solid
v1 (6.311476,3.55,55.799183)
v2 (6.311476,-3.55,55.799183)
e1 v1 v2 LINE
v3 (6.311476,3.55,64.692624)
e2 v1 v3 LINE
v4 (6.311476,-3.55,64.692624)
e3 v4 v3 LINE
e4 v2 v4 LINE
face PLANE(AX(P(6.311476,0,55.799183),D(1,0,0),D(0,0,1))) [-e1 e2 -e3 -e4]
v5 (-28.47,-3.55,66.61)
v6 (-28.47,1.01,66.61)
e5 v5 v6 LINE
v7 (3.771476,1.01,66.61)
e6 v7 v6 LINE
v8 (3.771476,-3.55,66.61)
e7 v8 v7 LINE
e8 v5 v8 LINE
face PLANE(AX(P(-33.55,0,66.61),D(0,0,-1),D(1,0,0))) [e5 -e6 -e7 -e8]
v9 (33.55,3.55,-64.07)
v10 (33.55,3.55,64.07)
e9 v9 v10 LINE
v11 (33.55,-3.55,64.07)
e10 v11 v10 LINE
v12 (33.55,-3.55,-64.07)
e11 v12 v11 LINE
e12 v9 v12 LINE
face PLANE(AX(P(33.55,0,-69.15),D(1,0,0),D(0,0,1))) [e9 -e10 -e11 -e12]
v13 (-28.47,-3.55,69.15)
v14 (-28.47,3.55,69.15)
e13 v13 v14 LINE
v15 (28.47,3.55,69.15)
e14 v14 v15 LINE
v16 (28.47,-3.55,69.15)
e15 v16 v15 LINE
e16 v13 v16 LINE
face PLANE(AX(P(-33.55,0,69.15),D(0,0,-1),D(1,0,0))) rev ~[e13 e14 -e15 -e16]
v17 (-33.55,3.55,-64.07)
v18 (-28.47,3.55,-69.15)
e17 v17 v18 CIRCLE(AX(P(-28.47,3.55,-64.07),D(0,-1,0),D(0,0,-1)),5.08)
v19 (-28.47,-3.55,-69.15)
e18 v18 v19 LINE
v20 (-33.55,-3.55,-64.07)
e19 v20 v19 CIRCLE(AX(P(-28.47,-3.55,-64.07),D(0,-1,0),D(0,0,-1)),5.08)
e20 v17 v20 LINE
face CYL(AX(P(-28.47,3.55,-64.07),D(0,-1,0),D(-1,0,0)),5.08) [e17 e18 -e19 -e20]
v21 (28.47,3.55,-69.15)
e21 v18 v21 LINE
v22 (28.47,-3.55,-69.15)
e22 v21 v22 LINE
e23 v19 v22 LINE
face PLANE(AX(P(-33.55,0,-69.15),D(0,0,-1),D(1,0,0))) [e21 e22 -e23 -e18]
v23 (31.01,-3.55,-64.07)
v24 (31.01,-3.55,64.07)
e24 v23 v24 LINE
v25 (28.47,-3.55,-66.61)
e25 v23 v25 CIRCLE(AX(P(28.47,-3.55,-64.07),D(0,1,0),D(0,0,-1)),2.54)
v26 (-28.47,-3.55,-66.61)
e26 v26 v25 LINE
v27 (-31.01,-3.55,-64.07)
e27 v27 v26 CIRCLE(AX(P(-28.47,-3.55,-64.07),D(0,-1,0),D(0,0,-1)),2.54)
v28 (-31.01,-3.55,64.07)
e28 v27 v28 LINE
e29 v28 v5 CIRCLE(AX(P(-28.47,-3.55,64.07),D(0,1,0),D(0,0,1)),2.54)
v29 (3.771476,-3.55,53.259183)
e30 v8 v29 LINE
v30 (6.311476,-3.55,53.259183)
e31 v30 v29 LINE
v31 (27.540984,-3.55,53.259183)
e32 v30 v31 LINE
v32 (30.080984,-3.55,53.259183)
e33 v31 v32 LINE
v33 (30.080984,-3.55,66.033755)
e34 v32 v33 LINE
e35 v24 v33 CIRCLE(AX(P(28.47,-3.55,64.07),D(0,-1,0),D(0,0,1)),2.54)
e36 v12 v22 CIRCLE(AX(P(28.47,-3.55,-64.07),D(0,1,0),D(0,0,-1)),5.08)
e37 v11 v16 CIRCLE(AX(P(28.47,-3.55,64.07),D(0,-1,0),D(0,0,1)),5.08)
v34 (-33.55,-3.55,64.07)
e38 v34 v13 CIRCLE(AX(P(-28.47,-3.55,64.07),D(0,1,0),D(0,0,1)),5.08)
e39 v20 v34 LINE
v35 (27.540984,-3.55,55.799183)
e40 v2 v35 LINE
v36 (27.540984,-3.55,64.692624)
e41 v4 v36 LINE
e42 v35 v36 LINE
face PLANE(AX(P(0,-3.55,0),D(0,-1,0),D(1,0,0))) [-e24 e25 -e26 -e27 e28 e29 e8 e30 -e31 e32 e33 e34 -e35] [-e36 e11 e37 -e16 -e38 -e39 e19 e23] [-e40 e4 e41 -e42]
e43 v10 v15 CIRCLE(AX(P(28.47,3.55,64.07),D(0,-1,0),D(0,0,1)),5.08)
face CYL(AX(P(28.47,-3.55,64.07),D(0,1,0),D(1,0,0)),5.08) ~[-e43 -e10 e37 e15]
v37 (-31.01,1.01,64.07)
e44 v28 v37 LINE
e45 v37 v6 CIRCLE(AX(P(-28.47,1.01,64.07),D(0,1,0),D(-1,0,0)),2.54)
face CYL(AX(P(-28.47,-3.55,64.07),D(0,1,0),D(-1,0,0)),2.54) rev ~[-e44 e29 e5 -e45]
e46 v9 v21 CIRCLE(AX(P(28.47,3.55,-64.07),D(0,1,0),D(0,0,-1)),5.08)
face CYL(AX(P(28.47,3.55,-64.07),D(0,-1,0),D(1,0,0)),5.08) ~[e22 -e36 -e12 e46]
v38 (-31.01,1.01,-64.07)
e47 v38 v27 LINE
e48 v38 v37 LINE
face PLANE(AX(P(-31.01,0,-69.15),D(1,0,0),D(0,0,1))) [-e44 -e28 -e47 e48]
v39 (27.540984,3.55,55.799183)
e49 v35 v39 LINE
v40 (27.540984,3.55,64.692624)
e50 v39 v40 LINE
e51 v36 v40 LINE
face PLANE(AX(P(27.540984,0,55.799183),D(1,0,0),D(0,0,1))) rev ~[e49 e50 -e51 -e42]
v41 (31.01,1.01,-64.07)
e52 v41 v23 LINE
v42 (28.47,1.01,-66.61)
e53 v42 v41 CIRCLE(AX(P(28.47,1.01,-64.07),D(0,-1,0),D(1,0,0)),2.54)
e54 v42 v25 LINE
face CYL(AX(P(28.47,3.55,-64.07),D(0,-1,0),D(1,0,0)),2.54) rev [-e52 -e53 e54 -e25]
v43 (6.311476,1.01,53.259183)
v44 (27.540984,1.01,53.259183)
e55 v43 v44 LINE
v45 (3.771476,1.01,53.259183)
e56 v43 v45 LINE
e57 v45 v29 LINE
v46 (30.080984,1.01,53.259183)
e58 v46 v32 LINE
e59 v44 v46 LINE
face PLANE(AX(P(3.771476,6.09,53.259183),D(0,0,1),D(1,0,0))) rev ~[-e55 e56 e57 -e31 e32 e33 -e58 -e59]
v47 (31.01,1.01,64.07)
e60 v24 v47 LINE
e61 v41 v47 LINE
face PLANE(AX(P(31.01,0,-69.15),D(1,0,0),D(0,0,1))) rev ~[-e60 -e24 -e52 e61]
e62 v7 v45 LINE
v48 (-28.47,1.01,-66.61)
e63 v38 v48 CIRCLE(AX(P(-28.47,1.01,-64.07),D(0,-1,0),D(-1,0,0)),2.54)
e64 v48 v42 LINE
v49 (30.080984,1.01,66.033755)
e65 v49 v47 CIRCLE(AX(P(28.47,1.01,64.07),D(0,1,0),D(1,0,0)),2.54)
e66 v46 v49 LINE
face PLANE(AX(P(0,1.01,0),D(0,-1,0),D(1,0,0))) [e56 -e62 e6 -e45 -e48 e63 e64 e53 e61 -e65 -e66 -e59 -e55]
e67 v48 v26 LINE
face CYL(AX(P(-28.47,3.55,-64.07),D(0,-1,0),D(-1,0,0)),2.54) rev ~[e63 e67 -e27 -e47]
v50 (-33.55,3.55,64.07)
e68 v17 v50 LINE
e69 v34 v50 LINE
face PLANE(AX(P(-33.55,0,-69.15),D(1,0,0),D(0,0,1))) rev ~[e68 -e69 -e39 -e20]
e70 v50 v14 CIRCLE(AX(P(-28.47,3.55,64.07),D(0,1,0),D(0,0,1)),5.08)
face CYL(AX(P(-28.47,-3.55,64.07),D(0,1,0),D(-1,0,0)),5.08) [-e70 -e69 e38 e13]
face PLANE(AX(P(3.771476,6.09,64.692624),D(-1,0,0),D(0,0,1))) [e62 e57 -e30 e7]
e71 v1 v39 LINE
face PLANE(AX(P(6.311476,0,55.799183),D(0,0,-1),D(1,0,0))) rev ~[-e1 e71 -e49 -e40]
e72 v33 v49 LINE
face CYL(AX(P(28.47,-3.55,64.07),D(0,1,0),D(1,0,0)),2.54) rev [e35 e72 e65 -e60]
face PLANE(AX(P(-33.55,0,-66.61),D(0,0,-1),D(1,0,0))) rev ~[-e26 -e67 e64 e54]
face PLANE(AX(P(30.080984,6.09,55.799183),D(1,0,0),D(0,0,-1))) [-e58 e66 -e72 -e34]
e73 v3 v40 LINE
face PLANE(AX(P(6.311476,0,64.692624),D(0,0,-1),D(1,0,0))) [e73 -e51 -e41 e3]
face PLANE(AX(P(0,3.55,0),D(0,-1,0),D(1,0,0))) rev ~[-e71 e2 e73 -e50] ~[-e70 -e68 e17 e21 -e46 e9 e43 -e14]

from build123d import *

# Parameters (mm, degrees)
F0_W        = 67.1
F0_H        = 138.3
F0_W_2      = 21.2295074016
F0_H_2      = 8.8934414089
F1_DEPTH    = 3.55
F2_R        = 5.08
F3_T        = 2.54
F3_T3_DEPTH = 12.18


# Not quite as in the source:
# - a shell that OpenCascade refuses in one call is made with other operations: the cavity is built on its own and cut out


with BuildPart() as f1:
    # F0 (on Front) → F1 (new body, symmetric)
    with BuildSketch(Plane.XZ):
        Rectangle(F0_W, F0_H)
        with Locations((16.9262299314, 60.2459032089)):
            Rectangle(F0_W_2, F0_H_2, mode=Mode.SUBTRACT)
    extrude(amount=F1_DEPTH, both=True)

    # F2
    f2_edges = [f1.edges().sort_by_distance(p)[0] for p in [
        (33.55, 0, 69.15),
        (-33.55, 0, 69.15),
        (33.55, 0, -69.15),
        (-33.55, 0, -69.15),
    ]]
    fillet(f2_edges, radius=F2_R)

    # F3: shell of thickness 2.54, made by hand


with BuildPart() as f3_core1:
    # F3_t2: copy of F1
    add(f1.part)

    # the walls: a layer under each face that stays
    f3_faces = [f3_core1.faces().sort_by_distance(p)[0] for p in [
        (0, 0, 69.15),
        (0, 3.55, 0),
        (32.0621024484, 0, 67.6621024484),
        (-32.0621024484, 0, 67.6621024484),
        (33.55, 0, 0),
        (-33.55, 0, 0),
        (32.0621024484, 0, -67.6621024484),
        (-32.0621024484, 0, -67.6621024484),
        (0, 0, -69.15),
        (6.3114762306, 0, 60.2459032089),
        (16.9262299314, 0, 64.6926239133),
        (27.5409836322, 0, 60.2459032089),
        (16.9262299314, 0, 55.7991825044),
    ]]
    thicken(f3_faces, amount=-F3_T, mode=Mode.SUBTRACT)

    # F3_s4 → F3_t3 (cut)
    with BuildSketch(Plane.XZ.offset(-6.09)):
        Polygon((6.3368762306, 64.6672239133), (3.7714762306, 64.6926239133), (3.7714762306, 67.2326239133), (6.3114762306, 67.2326239133), align=None)
        Polygon((6.3368762306, 55.8245825044), (3.7714762306, 55.7991825044), (3.7714762306, 53.2591825044), (6.3114762306, 53.2591825044), align=None)
        Polygon((27.5155836322, 64.6672239133), (27.5409836322, 67.2326239133), (30.0809836322, 67.2326239133), (30.0809836322, 64.6926239133), align=None)
        Polygon((27.5155836322, 55.8245825044), (30.0809836322, 55.7991825044), (30.0809836322, 53.2591825044), (27.5409836322, 53.2591825044), align=None)
    extrude(amount=F3_T3_DEPTH, mode=Mode.SUBTRACT)


with BuildPart() as f1_1:
    add(f1.part)

    # what is left inside the walls is the cavity
    f3_cavity = [f3_core1.part.solids().sort_by_distance(p)[0] for p in [
        (0, -3.5246, -22.203333),
    ]]
    add(f3_cavity, mode=Mode.SUBTRACT)


solid = f1_1.part
